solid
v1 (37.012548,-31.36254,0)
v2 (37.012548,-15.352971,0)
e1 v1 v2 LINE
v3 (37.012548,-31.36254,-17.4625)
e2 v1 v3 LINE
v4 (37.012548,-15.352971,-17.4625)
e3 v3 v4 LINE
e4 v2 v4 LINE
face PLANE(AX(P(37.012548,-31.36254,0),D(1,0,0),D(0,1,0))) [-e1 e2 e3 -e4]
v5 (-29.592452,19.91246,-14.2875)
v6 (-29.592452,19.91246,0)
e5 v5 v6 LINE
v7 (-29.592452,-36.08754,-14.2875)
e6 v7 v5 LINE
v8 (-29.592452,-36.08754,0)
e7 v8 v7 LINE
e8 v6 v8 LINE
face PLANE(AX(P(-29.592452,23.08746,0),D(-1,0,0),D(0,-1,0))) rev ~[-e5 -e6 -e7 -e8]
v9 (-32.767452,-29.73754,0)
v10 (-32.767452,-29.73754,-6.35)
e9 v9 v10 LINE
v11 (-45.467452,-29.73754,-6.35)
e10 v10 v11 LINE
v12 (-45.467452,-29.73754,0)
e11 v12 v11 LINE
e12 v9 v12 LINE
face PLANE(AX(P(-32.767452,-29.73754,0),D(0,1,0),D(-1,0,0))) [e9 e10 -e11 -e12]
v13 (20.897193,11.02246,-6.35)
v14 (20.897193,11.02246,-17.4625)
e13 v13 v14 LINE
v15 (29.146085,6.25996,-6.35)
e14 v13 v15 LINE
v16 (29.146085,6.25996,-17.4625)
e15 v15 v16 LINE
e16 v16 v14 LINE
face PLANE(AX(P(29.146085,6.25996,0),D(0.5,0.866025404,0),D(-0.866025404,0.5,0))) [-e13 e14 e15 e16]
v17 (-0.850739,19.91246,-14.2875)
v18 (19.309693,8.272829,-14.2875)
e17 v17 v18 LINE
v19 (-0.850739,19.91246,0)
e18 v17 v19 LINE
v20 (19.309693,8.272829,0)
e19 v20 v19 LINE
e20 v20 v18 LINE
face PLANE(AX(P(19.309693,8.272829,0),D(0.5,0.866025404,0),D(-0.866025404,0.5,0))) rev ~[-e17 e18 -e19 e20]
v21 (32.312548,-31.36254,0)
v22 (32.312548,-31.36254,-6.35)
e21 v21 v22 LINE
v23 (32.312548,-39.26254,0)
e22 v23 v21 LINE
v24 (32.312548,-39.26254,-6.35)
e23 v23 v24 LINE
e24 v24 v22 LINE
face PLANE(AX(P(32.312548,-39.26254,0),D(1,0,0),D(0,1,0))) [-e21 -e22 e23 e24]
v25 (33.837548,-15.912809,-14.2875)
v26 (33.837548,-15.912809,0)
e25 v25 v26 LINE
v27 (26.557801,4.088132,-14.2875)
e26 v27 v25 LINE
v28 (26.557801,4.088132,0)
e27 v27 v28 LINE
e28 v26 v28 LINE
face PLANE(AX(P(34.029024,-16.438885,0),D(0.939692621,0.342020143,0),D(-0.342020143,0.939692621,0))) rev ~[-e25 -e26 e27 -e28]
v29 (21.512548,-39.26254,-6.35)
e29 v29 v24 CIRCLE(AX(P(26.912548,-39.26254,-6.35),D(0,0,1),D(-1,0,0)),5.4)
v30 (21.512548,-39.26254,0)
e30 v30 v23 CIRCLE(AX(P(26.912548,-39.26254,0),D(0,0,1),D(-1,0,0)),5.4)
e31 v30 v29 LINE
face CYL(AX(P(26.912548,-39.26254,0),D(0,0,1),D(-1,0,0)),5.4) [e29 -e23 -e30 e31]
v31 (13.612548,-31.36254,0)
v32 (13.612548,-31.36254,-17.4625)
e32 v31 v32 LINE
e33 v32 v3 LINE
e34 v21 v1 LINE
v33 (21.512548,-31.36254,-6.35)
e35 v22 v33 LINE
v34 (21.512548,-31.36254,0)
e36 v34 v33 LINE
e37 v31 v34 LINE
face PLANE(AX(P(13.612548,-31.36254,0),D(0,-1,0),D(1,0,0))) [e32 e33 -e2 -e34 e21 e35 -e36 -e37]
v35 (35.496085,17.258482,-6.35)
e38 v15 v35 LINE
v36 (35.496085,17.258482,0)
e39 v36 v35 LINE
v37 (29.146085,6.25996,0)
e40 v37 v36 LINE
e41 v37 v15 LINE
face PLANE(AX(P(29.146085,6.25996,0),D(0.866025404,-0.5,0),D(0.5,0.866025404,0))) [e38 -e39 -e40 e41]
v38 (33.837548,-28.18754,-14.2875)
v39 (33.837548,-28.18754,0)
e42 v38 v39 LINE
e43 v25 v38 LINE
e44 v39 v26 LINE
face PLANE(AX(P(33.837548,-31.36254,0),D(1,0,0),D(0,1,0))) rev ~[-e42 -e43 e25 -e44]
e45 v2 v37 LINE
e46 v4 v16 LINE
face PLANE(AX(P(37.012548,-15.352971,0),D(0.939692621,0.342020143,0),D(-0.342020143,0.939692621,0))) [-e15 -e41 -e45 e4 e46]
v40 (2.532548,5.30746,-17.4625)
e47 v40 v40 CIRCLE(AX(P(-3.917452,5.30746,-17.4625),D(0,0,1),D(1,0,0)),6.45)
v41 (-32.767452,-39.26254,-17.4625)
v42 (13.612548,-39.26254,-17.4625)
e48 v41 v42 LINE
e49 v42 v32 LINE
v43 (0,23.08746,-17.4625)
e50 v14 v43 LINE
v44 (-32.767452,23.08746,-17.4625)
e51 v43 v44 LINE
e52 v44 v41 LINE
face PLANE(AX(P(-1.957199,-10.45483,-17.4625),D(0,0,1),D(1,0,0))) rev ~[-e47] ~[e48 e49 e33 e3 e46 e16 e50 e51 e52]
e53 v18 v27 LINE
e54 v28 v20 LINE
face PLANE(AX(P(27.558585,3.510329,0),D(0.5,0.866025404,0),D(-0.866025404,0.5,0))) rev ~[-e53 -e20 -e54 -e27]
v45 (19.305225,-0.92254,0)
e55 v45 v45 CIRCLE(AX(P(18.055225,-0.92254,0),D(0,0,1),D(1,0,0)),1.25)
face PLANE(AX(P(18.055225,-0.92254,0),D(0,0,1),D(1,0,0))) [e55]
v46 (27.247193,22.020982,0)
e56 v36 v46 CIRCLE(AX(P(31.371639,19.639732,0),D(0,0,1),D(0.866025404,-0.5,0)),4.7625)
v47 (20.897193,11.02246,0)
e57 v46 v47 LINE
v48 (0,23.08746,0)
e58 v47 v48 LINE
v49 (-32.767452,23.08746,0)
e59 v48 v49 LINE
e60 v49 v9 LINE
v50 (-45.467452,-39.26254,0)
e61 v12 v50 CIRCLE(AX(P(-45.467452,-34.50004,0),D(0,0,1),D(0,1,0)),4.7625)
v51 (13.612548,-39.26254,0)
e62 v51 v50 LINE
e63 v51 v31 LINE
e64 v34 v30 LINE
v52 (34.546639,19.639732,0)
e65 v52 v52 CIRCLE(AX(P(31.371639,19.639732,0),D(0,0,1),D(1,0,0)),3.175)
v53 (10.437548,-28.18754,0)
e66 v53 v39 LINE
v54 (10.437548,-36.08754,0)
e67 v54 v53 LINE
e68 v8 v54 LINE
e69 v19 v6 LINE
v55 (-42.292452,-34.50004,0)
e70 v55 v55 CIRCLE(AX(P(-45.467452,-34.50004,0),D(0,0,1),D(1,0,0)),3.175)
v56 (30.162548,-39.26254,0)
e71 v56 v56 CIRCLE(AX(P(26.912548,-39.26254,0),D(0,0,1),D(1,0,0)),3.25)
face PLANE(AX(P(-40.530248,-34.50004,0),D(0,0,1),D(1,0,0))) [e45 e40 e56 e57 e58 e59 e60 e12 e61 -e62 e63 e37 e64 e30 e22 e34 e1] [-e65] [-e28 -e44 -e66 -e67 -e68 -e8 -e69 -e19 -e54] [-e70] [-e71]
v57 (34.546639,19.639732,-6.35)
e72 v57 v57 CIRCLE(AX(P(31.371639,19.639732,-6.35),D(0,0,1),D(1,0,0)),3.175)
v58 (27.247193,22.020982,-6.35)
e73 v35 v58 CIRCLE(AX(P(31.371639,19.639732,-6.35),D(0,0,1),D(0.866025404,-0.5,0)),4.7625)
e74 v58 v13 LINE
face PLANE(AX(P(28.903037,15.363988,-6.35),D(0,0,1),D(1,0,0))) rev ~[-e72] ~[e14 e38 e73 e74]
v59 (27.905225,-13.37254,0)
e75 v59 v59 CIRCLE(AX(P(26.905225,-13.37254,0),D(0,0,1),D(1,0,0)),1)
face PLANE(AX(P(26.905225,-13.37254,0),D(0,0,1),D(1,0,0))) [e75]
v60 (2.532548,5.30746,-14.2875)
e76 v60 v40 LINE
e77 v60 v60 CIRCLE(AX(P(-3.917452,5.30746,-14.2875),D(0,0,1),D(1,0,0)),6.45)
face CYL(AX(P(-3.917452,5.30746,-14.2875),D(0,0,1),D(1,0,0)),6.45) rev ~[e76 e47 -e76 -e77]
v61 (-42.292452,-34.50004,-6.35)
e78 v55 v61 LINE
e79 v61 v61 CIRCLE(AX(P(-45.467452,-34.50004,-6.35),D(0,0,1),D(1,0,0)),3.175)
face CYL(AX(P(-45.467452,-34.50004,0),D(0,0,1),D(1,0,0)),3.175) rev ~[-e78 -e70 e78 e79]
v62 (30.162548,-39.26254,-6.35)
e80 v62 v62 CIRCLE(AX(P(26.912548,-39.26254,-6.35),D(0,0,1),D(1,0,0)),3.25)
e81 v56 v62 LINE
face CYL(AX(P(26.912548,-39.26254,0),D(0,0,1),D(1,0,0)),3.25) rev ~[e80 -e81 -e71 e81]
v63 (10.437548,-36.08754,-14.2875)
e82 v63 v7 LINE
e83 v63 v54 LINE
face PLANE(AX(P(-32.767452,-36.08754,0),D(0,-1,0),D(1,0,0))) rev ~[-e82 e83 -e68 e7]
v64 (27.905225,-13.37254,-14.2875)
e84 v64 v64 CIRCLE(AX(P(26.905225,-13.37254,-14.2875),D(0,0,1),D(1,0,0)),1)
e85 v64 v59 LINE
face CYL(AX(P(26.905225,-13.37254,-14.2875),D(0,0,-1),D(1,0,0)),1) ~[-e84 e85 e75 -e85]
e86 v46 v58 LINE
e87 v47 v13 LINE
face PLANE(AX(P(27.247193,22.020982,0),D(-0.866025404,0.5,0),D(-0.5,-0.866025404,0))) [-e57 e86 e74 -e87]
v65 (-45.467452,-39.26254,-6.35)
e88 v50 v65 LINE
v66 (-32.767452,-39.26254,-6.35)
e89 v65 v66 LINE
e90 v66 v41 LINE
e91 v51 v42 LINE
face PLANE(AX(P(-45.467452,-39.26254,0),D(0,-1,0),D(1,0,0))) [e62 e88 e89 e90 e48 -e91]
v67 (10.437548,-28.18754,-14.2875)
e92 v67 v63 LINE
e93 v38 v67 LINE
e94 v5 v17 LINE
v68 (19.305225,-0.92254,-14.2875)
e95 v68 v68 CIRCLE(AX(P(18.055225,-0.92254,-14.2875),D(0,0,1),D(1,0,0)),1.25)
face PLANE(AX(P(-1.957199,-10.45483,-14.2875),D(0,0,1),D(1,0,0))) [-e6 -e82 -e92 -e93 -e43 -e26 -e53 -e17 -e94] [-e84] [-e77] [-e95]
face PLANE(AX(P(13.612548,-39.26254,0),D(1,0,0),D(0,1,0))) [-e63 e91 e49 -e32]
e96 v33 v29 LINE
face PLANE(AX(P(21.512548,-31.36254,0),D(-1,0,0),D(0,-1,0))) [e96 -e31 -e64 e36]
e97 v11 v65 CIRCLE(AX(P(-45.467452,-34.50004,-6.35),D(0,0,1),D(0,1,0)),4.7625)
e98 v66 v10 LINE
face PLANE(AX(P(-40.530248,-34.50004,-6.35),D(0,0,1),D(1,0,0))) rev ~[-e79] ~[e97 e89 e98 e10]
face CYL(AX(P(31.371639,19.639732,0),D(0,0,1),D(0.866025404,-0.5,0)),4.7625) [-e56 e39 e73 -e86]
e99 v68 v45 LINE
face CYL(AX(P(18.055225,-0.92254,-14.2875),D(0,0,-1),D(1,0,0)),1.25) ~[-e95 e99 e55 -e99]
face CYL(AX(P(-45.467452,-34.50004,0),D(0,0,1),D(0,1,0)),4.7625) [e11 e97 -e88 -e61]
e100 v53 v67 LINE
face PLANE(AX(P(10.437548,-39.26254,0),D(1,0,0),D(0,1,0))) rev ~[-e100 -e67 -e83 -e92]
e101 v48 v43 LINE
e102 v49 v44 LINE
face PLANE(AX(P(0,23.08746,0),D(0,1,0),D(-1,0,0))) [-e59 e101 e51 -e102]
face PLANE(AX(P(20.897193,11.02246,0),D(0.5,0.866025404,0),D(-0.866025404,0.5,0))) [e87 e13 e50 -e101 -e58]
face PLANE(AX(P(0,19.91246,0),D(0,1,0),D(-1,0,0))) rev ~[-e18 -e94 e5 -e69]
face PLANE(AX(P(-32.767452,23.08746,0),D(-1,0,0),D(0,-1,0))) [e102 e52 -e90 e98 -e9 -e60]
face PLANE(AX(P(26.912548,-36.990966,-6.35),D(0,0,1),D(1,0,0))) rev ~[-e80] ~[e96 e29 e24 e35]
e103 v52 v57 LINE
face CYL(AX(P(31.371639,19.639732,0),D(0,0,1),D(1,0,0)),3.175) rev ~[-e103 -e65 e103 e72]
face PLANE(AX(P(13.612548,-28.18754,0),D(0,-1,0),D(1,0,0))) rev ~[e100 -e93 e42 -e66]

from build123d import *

# Parameters (mm, degrees)
F1_DEPTH = 17.4625
F2_T     = -3.175
F0_R     = 3.175
F0_R_2   = 3.25
F3_DEPTH = 6.35
F4_R     = 1
F4_R_2   = 1.25
F5_DEPTH = 14.2875
F4_R_3   = 6.45
F6_DEPTH = 3.176


# Not quite as in the source:
# - a feature names something its author has since deleted; it is built from what else it names


with BuildPart() as f1:
    # F0 (on Top) → F1 (new body)
    with BuildSketch(Plane.XY):
        Polygon((-32.7674517391, -39.2625403754), (13.6125482609, -39.2625403754), (13.6125482609, -31.3625403754), (21.5125482609, -31.3625403754), (32.3125482609, -31.3625403754), (37.0125482609, -31.3625403754), (37.0125482609, -15.3529706535), (29.1460849644, 6.2599596246), (20.8971929933, 11.0224596246), (0, 23.0874596246), (-32.7674517391, 23.0874596246), (-32.7674517391, -29.7375403754), align=None)
    extrude(amount=-F1_DEPTH)

    # F2
    f2_openings = [f1.faces().sort_by_distance(p)[0] for p in [
        (-2.028392, -9.399027, 0),
    ]]
    offset(amount=F2_T, openings=f2_openings, kind=Kind.INTERSECTION)

    # F0 (on Top) → F3 (join)
    with BuildSketch(Plane.XY):
        with BuildLine():
            Line((-45.4674517391, -39.2625403754), (-32.7674517391, -39.2625403754))
            Line((-32.7674517391, -39.2625403754), (-32.7674517391, -29.7375403754))
            Line((-32.7674517391, -29.7375403754), (-45.4674517391, -29.7375403754))
            ThreePointArc((-45.4674517391, -29.7375403754), (-50.2299517391, -34.5000403754), (-45.4674517391, -39.2625403754))
        make_face()
        with Locations((-45.4674517391, -34.5000403754)):
            Circle(F0_R, mode=Mode.SUBTRACT)
        with BuildLine():
            Line((27.2471929933, 22.0209822527), (20.8971929933, 11.0224596246))
            Line((20.8971929933, 11.0224596246), (29.1460849644, 6.2599596246))
            Line((29.1460849644, 6.2599596246), (35.4960849644, 17.2584822527))
            ThreePointArc((35.4960849644, 17.2584822527), (33.7528889788, 23.7641782382), (27.2471929933, 22.0209822527))
        make_face()
        with Locations((31.3716389788, 19.6397322527)):
            Circle(F0_R, mode=Mode.SUBTRACT)
        with BuildLine():
            Line((32.3125482609, -31.3625403754), (21.5125482609, -31.3625403754))
            Line((21.5125482609, -31.3625403754), (21.5125482609, -39.2625403754))
            ThreePointArc((21.5125482609, -39.2625403754), (26.9125482609, -44.6625403754), (32.3125482609, -39.2625403754))
            Line((32.3125482609, -39.2625403754), (32.3125482609, -31.3625403754))
        make_face()
        with Locations((26.9125482609, -39.2625403754)):
            Circle(F0_R_2, mode=Mode.SUBTRACT)
    extrude(amount=-F3_DEPTH)

    # F4 (on face) → F5 (join, through all)
    with BuildSketch(Plane.XY.offset(-14.2875)):
        with Locations((26.905224515, -13.3725403754)):
            Circle(F4_R)
        with Locations((18.055224515, -0.9225403754)):
            Circle(F4_R_2)
    extrude(amount=F5_DEPTH)

    # F4 (on face) → F6 (cut, through all)
    with BuildSketch(Plane.XY.offset(-14.2875)):
        with Locations((-3.9174517391, 5.3074596246)):
            Circle(F4_R_3)
    extrude(amount=-F6_DEPTH, mode=Mode.SUBTRACT)


solid = f1.part
